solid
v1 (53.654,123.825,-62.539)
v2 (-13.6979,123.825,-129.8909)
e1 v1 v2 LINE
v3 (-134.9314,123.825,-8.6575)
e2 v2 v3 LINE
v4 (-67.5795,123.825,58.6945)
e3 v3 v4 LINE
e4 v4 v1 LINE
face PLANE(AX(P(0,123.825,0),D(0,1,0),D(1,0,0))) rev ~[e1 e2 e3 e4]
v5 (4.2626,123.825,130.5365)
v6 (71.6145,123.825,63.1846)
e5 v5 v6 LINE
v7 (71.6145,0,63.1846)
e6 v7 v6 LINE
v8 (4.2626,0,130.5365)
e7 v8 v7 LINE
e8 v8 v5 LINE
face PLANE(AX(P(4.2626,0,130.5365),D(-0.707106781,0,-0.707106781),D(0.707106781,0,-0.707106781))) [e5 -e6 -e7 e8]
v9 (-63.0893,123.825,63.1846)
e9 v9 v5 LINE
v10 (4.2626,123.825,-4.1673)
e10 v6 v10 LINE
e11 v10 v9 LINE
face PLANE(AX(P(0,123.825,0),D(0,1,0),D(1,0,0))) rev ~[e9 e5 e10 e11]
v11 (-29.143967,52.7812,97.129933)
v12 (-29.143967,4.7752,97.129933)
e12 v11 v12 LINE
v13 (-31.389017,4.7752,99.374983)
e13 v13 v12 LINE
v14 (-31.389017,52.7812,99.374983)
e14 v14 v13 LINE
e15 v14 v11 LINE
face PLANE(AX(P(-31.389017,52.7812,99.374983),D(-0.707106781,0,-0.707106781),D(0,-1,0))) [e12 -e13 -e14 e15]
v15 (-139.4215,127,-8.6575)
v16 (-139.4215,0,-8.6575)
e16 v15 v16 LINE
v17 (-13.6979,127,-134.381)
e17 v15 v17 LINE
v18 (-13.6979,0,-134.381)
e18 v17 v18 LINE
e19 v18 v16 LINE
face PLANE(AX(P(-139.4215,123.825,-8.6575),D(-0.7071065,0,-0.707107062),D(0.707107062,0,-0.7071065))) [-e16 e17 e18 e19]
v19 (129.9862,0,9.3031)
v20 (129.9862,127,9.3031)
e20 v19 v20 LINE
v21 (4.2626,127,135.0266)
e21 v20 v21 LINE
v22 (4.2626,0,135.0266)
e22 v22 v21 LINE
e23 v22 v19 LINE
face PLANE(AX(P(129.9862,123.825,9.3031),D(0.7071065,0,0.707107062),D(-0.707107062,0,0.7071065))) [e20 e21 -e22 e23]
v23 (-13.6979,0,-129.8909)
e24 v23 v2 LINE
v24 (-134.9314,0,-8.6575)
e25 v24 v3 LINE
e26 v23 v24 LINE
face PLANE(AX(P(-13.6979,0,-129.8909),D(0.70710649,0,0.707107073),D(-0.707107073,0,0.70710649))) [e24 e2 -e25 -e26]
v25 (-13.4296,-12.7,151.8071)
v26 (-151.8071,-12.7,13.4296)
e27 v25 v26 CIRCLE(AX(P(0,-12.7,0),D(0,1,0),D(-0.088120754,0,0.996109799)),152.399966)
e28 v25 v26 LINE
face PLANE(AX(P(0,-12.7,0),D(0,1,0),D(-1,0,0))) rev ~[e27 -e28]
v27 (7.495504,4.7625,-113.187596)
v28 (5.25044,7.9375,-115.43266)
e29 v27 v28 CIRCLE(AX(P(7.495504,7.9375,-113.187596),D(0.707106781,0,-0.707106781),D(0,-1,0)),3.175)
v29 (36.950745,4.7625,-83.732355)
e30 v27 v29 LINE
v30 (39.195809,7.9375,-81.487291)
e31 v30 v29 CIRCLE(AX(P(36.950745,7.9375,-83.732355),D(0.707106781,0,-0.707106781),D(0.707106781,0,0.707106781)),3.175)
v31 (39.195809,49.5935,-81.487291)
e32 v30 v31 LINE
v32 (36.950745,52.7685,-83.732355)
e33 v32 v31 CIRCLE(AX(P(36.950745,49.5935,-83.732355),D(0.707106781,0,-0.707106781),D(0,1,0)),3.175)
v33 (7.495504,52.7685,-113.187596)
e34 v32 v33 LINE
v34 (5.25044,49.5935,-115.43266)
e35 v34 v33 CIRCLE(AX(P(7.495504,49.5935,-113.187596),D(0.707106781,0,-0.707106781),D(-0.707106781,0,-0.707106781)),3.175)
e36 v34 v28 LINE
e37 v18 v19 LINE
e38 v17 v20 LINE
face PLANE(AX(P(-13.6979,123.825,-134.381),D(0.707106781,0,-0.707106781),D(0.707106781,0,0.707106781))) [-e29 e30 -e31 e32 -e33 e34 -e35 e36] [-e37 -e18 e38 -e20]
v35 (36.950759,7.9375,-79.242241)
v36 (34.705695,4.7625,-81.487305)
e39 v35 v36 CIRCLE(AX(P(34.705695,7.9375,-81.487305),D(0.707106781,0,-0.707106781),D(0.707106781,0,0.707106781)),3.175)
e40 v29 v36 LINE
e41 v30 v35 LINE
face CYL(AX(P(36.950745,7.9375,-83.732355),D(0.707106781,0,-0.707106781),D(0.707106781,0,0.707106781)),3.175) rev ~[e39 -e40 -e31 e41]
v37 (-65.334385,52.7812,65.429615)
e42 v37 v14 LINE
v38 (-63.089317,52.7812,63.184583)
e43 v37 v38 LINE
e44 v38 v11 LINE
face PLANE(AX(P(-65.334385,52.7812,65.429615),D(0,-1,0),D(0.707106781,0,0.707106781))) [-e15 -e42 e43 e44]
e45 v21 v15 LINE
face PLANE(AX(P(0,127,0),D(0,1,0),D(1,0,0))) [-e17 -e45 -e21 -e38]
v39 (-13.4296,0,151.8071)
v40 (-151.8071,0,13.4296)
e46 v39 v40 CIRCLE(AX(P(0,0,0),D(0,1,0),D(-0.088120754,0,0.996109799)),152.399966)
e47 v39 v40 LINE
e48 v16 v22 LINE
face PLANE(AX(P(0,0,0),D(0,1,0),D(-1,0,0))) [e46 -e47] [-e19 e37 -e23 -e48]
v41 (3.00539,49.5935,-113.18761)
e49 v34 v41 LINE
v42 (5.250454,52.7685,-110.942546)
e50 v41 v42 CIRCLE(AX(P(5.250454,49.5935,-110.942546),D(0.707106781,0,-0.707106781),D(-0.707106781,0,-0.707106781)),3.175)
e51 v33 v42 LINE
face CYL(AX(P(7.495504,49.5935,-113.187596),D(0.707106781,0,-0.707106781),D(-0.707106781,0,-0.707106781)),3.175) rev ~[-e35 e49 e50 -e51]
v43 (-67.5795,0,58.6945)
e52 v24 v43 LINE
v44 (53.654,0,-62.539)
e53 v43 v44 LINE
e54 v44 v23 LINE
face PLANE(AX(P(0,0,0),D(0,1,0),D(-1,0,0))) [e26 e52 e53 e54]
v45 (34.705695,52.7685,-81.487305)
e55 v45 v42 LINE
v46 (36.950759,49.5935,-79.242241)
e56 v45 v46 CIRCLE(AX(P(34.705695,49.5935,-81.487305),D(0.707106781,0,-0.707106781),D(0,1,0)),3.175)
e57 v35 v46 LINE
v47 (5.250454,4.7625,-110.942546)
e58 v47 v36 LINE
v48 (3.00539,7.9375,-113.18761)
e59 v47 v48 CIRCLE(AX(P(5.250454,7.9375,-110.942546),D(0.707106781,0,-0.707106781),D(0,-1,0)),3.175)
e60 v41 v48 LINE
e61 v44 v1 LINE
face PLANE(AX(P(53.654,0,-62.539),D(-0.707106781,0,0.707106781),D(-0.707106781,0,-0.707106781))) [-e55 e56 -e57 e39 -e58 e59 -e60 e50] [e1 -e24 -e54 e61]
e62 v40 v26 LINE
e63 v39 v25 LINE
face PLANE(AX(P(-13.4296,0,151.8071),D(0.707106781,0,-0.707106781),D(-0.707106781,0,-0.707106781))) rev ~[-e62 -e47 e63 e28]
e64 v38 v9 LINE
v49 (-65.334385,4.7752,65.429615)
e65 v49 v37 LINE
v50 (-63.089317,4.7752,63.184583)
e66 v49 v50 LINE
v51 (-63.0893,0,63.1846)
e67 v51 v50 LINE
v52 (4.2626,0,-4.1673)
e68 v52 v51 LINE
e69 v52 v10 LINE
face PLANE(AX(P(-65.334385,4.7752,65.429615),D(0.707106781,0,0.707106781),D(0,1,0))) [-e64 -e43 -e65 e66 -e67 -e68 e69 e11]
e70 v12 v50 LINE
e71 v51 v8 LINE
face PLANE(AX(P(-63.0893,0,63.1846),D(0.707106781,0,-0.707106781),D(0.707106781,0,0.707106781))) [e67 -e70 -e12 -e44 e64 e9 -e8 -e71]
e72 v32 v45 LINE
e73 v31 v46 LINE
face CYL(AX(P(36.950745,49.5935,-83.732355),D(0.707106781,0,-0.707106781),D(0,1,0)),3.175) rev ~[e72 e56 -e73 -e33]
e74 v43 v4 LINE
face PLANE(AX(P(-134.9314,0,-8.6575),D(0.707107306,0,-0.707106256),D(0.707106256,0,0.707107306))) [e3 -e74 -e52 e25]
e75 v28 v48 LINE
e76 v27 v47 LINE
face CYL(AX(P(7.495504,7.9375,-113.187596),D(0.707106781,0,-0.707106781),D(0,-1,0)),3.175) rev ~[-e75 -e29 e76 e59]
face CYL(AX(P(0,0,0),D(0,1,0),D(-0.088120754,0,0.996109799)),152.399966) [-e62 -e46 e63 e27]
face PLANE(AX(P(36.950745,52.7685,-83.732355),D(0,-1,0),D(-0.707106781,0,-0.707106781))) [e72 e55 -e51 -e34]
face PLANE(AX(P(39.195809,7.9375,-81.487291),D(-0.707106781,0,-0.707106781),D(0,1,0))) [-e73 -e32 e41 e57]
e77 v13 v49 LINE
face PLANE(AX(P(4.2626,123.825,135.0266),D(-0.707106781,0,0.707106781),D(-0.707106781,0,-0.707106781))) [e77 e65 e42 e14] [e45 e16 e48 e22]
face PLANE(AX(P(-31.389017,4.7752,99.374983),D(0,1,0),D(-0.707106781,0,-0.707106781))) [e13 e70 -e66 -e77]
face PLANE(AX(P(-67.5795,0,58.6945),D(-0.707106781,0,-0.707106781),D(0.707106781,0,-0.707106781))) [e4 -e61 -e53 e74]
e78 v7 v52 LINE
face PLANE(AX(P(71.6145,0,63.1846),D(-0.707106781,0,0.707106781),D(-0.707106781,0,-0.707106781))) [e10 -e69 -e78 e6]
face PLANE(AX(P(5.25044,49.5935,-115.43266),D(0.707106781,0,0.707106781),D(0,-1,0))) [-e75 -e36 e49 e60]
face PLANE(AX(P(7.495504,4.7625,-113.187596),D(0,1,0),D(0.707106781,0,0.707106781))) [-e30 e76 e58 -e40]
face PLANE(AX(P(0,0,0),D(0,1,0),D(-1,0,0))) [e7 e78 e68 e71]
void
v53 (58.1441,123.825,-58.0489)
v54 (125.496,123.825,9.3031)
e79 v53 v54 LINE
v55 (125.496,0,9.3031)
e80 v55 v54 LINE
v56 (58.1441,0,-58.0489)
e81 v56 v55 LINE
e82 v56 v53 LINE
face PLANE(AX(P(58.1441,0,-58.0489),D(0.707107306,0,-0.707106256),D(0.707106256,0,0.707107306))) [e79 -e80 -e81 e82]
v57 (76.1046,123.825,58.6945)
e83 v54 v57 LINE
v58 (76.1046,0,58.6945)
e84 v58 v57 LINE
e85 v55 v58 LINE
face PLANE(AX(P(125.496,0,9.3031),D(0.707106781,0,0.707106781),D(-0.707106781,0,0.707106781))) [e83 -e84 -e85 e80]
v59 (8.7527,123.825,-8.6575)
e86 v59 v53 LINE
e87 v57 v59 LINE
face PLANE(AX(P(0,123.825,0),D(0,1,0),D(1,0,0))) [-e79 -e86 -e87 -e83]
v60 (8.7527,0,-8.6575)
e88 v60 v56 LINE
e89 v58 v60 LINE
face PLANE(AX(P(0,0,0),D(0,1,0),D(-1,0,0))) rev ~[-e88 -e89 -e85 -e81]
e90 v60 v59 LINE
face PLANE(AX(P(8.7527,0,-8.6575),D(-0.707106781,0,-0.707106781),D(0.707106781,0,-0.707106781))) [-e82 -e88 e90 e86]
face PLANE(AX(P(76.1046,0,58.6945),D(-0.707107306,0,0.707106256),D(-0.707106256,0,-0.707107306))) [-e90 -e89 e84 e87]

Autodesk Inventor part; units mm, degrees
ref_plane "YZ Plane" through (0, 0, 0) normal (1, 0, 0) x (0, 1, 0)
ref_plane "XZ Plane" through (0, 0, 0) normal (0, 1, 0) x (-1, 0, 0)
ref_plane "XY Plane" through (0, 0, 0) normal (0, 0, 1) x (1, 0, 0)
sketch "Sketch1" plane through (0, 0, 0) normal (0, 1, 0) x (-1, 0, 0)
  arc A0 (13.4296, 151.8071) -> (151.8071, 13.4296) centre (0, 0) ccw
  line L0 (13.4296, 151.8071) -> (151.8071, 13.4296)
  dimension "d0" = 304.8
sketch "Sketch2" plane through (0, 0, 0) normal (0, 1, 0) x (-1, 0, 0)
  line L0 (-4.2626, 135.0266) -> (-129.9862, 9.3031)
  line L1 (-129.9862, 9.3031) -> (13.6979, -134.381)
  line L2 (13.6979, -134.381) -> (139.4215, -8.6575)
  line L3 (139.4215, -8.6575) -> (-4.2626, 135.0266)
  line L4 (-4.2626, 135.0266) -> (-76.1046, 63.1846)
  line L5 (-76.1046, 63.1846) -> (-4.2626, -8.6575)
  line L6 (-4.2626, -8.6575) -> (67.5795, 63.1846)
  line L7 (67.5795, 63.1846) -> (-4.2626, 135.0266)
  line L8 (-129.9862, 9.3031) -> (-76.1046, 63.1846)
  line L9 (-76.1046, 63.1846) -> (-4.2626, -8.6575)
  line L10 (-4.2626, -8.6575) -> (-58.1441, -62.539)
  line L11 (-58.1441, -62.539) -> (-129.9862, 9.3031)
  line L12 (-4.2626, 130.5365) -> (-71.6145, 63.1846)
  line L13 (-71.6145, 63.1846) -> (-4.2626, -4.1673)
  line L14 (-4.2626, -4.1673) -> (63.0893, 63.1846)
  line L15 (63.0893, 63.1846) -> (-4.2626, 130.5365)
  line L16 (-125.496, 9.3031) -> (-76.1046, 58.6945)
  line L17 (-76.1046, 58.6945) -> (-8.7527, -8.6575)
  line L18 (-8.7527, -8.6575) -> (-58.1441, -58.0489)
  line L19 (-58.1441, -58.0489) -> (-125.496, 9.3031)
  line L20 (67.5795, 58.6945) -> (-53.654, -62.539)
  line L21 (-53.654, -62.539) -> (13.6979, -129.8909)
  line L22 (13.6979, -129.8909) -> (134.9314, -8.6575)
  line L23 (134.9314, -8.6575) -> (67.5795, 58.6945)
  point P0 (0, 0)
  point P1 (4.7177, 0.3228)
  dimension "d42" = 203.2
  dimension "d43" = 177.8
  dimension "d44" = 3.175
  dimension "d45" = 6.35
  dimension "d46" = 95.25
  dimension "d47" = 171.45
  dimension "d48" = 95.25
  dimension "d49" = 69.85
  dimension "d50" = 95.25
extrude "Extrusion1" add sketch "Sketch1" against normal blind 12.7
extrude "Extrusion2" add sketch "Sketch2" along normal blind 127
sketch "Sketch3" plane through (-13.6979, 0, -134.381) normal (0.7071068, 0, -0.7071068) x (-0.7071068, 0, -0.7071068)
  line L0 (-29.972, 4.7625) -> (-71.628, 4.7625)
  line L1 (-74.803, 7.9375) -> (-74.803, 49.5935)
  line L2 (-71.628, 52.7685) -> (-29.972, 52.7685)
  line L3 (-26.797, 49.5935) -> (-26.797, 7.9375)
  line L4 (-257.1076, 0) -> (47.6924, 0) projected
  line L5 (0, 0) -> (0, 127) projected
  arc A0 (-26.797, 49.5935) -> (-29.972, 52.7685) centre (-29.972, 49.5935) ccw
  arc A1 (-29.972, 4.7625) -> (-26.797, 7.9375) centre (-29.972, 7.9375) ccw
  arc A2 (-74.803, 7.9375) -> (-71.628, 4.7625) centre (-71.628, 7.9375) ccw
  arc A3 (-71.628, 52.7685) -> (-74.803, 49.5935) centre (-71.628, 49.5935) ccw
  point P0 (-104.7076, 0)
  point P1 (-74.803, 52.7685)
  point P2 (-74.803, 4.7625)
  point P3 (-26.797, 52.7685)
  point P4 (-6.8599, 0)
  point P5 (-202.5554, 0)
  dimension "d25" = 4.7625
  dimension "d26" = 48.006
  dimension "d27" = 26.797
  dimension "d28" = 48.006
  dimension "d29" = 3.175
sketch "Sketch4" plane through (4.2626, 0, 135.0266) normal (-0.7071068, 0, 0.7071068) x (0.7071068, 0, 0.7071068)
  line L0 (-98.425, 52.7812) -> (-50.419, 52.7812)
  line L1 (-50.419, 52.7812) -> (-50.419, 4.7752)
  line L2 (-50.419, 4.7752) -> (-98.425, 4.7752)
  line L3 (-98.425, 4.7752) -> (-98.425, 52.7812)
  line L4 (-0.6446, 0) -> (-196.3401, 0) projected
  line L5 (0, 0) -> (0, 127) projected
  point P0 (-98.4924, 0)
  dimension "d30" = 48.006
  dimension "d31" = 48.006
  dimension "d32" = 4.7752
  dimension "d33" = 50.419
extrude "Extrusion3" cut sketch "Sketch4" against normal up to next
extrude "Extrusion4" cut sketch "Sketch3" against normal up to next
sketch "Sketch5" plane through (0, 127, 0) normal (0, 1, 0) x (1, 0, 0)
  line L0 (-139.4215, 8.6575) -> (-13.6979, 134.381) projected
  line L1 (4.2626, -135.0266) -> (-139.4215, 8.6575)
  line L2 (-139.4215, 8.6575) -> (-13.6979, 134.381)
  line L3 (-13.6979, 134.381) -> (129.9862, -9.3031) projected
  line L4 (-13.6979, 134.381) -> (129.9862, -9.3031)
  line L5 (129.9862, -9.3031) -> (4.2626, -135.0266)
  point P0 (0, 0)
extrude "Extrusion5" cut sketch "Sketch5" against normal blind 3.175
sketch "Sketch6" plane through (0, 123.825, 0) normal (0, 1, 0) x (1, 0, 0)
  line L0 (4.2626, -135.0266) -> (-139.4215, 8.6575) projected
  line L1 (4.2626, -135.0266) -> (-139.4215, 8.6575)
  line L2 (-139.4215, 8.6575) -> (-13.6979, 134.381)
  line L3 (-13.6979, 134.381) -> (129.9862, -9.3031) projected
  line L4 (-13.6979, 134.381) -> (129.9862, -9.3031)
  line L5 (129.9862, -9.3031) -> (4.2626, -135.0266)
  line L6 (4.2626, -130.5365) -> (71.6145, -63.1846) projected
  point P0 (0, 0)
extrude "Extrusion6" add sketch "Sketch6" along normal blind 3.175
sketch "Sketch7" plane through (0, 127, 0) normal (0, 1, 0) x (1, 0, 0)
  point P0 (0, 0)
properties part number "Hermes plate" material "Aluminum 6061"
